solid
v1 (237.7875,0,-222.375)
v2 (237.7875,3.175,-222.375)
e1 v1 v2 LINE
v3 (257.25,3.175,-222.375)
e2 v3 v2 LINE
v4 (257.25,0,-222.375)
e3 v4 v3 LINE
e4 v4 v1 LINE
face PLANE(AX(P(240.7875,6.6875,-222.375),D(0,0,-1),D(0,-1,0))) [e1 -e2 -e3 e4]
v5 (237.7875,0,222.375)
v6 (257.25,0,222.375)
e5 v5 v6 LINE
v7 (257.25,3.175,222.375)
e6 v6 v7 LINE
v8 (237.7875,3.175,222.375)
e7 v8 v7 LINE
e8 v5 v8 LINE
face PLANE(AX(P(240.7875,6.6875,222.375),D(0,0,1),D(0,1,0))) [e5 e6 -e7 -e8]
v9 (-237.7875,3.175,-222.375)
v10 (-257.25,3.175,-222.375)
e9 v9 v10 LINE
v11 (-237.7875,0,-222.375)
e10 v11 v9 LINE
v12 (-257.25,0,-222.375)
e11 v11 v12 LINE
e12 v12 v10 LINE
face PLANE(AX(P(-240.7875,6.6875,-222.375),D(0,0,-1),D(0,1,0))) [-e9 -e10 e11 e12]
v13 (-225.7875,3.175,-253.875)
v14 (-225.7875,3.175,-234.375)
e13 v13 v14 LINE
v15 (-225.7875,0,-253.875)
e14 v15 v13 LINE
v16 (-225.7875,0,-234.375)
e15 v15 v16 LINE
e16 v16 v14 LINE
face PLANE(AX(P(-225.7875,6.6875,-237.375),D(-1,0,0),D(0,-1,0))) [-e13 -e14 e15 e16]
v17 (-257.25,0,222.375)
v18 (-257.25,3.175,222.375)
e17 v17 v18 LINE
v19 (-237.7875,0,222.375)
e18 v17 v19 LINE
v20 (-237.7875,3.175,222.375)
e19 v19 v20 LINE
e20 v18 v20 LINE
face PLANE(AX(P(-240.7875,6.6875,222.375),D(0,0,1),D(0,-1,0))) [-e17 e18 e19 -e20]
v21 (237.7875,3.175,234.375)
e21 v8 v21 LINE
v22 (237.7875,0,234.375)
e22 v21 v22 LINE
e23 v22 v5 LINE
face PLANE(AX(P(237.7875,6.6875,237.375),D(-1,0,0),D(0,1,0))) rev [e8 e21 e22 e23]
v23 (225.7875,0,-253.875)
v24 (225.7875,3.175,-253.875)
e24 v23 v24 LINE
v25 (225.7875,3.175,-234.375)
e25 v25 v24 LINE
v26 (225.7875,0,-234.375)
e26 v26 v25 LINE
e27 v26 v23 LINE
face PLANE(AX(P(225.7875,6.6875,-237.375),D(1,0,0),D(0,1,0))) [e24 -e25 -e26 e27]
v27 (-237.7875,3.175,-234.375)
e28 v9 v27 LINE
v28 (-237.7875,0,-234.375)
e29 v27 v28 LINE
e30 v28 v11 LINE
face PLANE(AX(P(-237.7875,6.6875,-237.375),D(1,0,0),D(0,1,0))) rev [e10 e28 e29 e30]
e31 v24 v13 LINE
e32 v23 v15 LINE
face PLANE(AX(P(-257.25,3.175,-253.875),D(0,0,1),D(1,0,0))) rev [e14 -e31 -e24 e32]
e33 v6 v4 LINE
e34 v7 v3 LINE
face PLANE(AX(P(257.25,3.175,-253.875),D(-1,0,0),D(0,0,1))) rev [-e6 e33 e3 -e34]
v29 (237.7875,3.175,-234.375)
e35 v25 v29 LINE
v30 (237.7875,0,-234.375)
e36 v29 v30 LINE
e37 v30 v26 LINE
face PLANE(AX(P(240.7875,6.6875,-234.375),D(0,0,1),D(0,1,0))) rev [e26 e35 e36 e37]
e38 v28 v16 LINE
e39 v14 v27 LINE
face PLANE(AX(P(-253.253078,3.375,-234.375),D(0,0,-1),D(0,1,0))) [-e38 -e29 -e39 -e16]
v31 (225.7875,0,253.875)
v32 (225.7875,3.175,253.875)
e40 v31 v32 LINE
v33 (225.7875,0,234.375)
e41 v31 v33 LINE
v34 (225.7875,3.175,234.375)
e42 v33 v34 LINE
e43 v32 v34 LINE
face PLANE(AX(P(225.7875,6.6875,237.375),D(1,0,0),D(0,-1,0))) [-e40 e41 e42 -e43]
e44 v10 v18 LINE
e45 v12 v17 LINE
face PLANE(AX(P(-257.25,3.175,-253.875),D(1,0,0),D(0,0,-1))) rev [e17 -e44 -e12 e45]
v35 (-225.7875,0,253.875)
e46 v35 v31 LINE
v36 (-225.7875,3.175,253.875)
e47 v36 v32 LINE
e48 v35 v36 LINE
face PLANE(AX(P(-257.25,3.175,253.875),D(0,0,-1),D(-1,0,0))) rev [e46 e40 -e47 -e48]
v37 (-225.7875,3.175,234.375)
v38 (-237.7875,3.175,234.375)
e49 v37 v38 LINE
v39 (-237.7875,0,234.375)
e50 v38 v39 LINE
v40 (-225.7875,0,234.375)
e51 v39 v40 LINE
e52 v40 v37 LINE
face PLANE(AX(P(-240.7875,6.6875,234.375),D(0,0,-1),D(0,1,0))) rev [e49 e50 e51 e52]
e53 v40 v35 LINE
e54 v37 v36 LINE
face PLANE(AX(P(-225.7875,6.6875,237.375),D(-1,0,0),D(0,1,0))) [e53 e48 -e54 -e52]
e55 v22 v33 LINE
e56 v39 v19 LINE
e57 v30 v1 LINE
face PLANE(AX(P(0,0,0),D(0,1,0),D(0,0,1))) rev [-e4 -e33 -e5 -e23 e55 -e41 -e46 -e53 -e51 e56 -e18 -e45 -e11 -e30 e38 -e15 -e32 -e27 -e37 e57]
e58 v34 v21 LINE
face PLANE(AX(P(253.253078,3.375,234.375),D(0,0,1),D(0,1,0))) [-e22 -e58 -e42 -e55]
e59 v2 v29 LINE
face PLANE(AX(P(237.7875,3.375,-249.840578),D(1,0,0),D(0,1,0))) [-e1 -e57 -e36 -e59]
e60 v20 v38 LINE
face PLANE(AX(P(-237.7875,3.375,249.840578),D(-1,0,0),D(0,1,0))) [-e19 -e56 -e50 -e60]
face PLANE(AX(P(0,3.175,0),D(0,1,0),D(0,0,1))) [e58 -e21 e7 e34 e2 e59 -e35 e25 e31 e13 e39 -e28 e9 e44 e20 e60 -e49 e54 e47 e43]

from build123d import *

# Parameters (mm, degrees)
SKETCH1_W           = 514.5
SKETCH1_H           = 507.75
BOSS_EXTRUDE1_DEPTH = 3.175
CAVITY1_START       = -252
CAVITY1_OUTLINE_W   = 29.625
CAVITY1_OUTLINE_H   = 3.175
CAVITY1_DEPTH       = 17.625
CAVITY1_START_2     = 222.375
CAVITY1_2_OUTLINE_W = 17.625
CAVITY1_2_OUTLINE_H = 3.175
CAVITY1_2_DEPTH     = 29.625
CAVITY1_START_3     = -234.375
CAVITY1_3_OUTLINE_W = 17.625
CAVITY1_3_OUTLINE_H = 3.175
CAVITY1_3_DEPTH     = 12
CAVITY1_START_4     = 234.375
CAVITY1_4_OUTLINE_W = 12
CAVITY1_4_OUTLINE_H = 3.175
CAVITY1_4_DEPTH     = 17.625
CAVITY1_5_OUTLINE_W = 1.8375
CAVITY1_5_OUTLINE_H = 3.175
CAVITY1_5_DEPTH     = 14.625
CAVITY1_START_5     = 237.375
CAVITY1_6_OUTLINE_W = 1.8375
CAVITY1_6_OUTLINE_H = 3.175
CAVITY1_6_DEPTH     = 14.625
SKETCH2_W           = 12
SKETCH2_H           = 19.5
CUT_EXTRUDE1_DEPTH  = 362.441777815


# Read off the part's stored shape, not the designer's step: Cavity1
with BuildPart() as part:
    # Sketch1 → Boss-Extrude1 (new body)
    with BuildSketch(Plane(origin=(0, 0, 0), x_dir=(1, 0, 0), z_dir=(0, 1, 0))):
        Rectangle(SKETCH1_W, SKETCH1_H)
    extrude(amount=BOSS_EXTRUDE1_DEPTH)

    # Cavity1 outline → Cavity1 (cut)
    with BuildSketch(Plane.XY.offset(CAVITY1_START)):
        with Locations((-240.6, 1.5875)):
            Rectangle(CAVITY1_OUTLINE_W, CAVITY1_OUTLINE_H)
        with Locations((240.6, 1.5875)):
            Rectangle(CAVITY1_OUTLINE_W, CAVITY1_OUTLINE_H)
    extrude(amount=CAVITY1_DEPTH, mode=Mode.SUBTRACT)

    # Cavity1 2 outline → Cavity1 2 (cut)
    with BuildSketch(Plane.XY.offset(CAVITY1_START_2)):
        with Locations((-246.6, 1.5875)):
            Rectangle(CAVITY1_2_OUTLINE_W, CAVITY1_2_OUTLINE_H)
        with Locations((246.6, 1.5875)):
            Rectangle(CAVITY1_2_OUTLINE_W, CAVITY1_2_OUTLINE_H)
    extrude(amount=CAVITY1_2_DEPTH, mode=Mode.SUBTRACT)

    # Cavity1 3 outline → Cavity1 3 (cut)
    with BuildSketch(Plane.XY.offset(CAVITY1_START_3)):
        with Locations((-246.6, 1.5875)):
            Rectangle(CAVITY1_3_OUTLINE_W, CAVITY1_3_OUTLINE_H)
        with Locations((246.6, 1.5875)):
            Rectangle(CAVITY1_3_OUTLINE_W, CAVITY1_3_OUTLINE_H)
    extrude(amount=CAVITY1_3_DEPTH, mode=Mode.SUBTRACT)

    # Cavity1 4 outline → Cavity1 4 (cut)
    with BuildSketch(Plane.XY.offset(CAVITY1_START_4)):
        with Locations((-231.7875, 1.5875)):
            Rectangle(CAVITY1_4_OUTLINE_W, CAVITY1_4_OUTLINE_H)
        with Locations((231.7875, 1.5875)):
            Rectangle(CAVITY1_4_OUTLINE_W, CAVITY1_4_OUTLINE_H)
    extrude(amount=CAVITY1_4_DEPTH, mode=Mode.SUBTRACT)

    # Cavity1 5 outline → Cavity1 5 (cut)
    with BuildSketch(Plane.XY.offset(CAVITY1_START)):
        with Locations((-256.33125, 1.5875)):
            Rectangle(CAVITY1_5_OUTLINE_W, CAVITY1_5_OUTLINE_H)
        with Locations((256.33125, 1.5875)):
            Rectangle(CAVITY1_5_OUTLINE_W, CAVITY1_5_OUTLINE_H)
    extrude(amount=CAVITY1_5_DEPTH, mode=Mode.SUBTRACT)

    # Cavity1 6 outline → Cavity1 6 (cut)
    with BuildSketch(Plane.XY.offset(CAVITY1_START_5)):
        with Locations((-256.33125, 1.5875)):
            Rectangle(CAVITY1_6_OUTLINE_W, CAVITY1_6_OUTLINE_H)
        with Locations((256.33125, 1.5875)):
            Rectangle(CAVITY1_6_OUTLINE_W, CAVITY1_6_OUTLINE_H)
    extrude(amount=CAVITY1_6_DEPTH, mode=Mode.SUBTRACT)

    # Sketch2 → Cut-Extrude1 (cut, through all)
    with BuildSketch(Plane(origin=(0, 3.175, 0), x_dir=(1, 0, 0), z_dir=(0, 1, 0))):
        Polygon((-237.7875, -234.375), (-237.7875, -222.375), (-257.25, -222.375), (-257.25, -253.875), (-237.7875, -253.875), align=None)
        with Locations((-231.7875, -244.125)):
            Rectangle(SKETCH2_W, SKETCH2_H)
        Polygon((257.25, -222.375), (237.7875, -222.375), (237.7875, -234.375), (237.7875, -253.875), (257.25, -253.875), align=None)
        with Locations((231.7875, -244.125)):
            Rectangle(SKETCH2_W, SKETCH2_H)
        Polygon((237.7875, 234.375), (237.7875, 222.375), (257.25, 222.375), (257.25, 253.875), (237.7875, 253.875), align=None)
        with Locations((231.7875, 244.125)):
            Rectangle(SKETCH2_W, SKETCH2_H)
        Polygon((-257.25, 222.375), (-237.7875, 222.375), (-237.7875, 234.375), (-237.7875, 253.875), (-257.25, 253.875), align=None)
        with Locations((-231.7875, 244.125)):
            Rectangle(SKETCH2_W, SKETCH2_H)
    extrude(amount=-CUT_EXTRUDE1_DEPTH, mode=Mode.SUBTRACT)


solid = part.part
